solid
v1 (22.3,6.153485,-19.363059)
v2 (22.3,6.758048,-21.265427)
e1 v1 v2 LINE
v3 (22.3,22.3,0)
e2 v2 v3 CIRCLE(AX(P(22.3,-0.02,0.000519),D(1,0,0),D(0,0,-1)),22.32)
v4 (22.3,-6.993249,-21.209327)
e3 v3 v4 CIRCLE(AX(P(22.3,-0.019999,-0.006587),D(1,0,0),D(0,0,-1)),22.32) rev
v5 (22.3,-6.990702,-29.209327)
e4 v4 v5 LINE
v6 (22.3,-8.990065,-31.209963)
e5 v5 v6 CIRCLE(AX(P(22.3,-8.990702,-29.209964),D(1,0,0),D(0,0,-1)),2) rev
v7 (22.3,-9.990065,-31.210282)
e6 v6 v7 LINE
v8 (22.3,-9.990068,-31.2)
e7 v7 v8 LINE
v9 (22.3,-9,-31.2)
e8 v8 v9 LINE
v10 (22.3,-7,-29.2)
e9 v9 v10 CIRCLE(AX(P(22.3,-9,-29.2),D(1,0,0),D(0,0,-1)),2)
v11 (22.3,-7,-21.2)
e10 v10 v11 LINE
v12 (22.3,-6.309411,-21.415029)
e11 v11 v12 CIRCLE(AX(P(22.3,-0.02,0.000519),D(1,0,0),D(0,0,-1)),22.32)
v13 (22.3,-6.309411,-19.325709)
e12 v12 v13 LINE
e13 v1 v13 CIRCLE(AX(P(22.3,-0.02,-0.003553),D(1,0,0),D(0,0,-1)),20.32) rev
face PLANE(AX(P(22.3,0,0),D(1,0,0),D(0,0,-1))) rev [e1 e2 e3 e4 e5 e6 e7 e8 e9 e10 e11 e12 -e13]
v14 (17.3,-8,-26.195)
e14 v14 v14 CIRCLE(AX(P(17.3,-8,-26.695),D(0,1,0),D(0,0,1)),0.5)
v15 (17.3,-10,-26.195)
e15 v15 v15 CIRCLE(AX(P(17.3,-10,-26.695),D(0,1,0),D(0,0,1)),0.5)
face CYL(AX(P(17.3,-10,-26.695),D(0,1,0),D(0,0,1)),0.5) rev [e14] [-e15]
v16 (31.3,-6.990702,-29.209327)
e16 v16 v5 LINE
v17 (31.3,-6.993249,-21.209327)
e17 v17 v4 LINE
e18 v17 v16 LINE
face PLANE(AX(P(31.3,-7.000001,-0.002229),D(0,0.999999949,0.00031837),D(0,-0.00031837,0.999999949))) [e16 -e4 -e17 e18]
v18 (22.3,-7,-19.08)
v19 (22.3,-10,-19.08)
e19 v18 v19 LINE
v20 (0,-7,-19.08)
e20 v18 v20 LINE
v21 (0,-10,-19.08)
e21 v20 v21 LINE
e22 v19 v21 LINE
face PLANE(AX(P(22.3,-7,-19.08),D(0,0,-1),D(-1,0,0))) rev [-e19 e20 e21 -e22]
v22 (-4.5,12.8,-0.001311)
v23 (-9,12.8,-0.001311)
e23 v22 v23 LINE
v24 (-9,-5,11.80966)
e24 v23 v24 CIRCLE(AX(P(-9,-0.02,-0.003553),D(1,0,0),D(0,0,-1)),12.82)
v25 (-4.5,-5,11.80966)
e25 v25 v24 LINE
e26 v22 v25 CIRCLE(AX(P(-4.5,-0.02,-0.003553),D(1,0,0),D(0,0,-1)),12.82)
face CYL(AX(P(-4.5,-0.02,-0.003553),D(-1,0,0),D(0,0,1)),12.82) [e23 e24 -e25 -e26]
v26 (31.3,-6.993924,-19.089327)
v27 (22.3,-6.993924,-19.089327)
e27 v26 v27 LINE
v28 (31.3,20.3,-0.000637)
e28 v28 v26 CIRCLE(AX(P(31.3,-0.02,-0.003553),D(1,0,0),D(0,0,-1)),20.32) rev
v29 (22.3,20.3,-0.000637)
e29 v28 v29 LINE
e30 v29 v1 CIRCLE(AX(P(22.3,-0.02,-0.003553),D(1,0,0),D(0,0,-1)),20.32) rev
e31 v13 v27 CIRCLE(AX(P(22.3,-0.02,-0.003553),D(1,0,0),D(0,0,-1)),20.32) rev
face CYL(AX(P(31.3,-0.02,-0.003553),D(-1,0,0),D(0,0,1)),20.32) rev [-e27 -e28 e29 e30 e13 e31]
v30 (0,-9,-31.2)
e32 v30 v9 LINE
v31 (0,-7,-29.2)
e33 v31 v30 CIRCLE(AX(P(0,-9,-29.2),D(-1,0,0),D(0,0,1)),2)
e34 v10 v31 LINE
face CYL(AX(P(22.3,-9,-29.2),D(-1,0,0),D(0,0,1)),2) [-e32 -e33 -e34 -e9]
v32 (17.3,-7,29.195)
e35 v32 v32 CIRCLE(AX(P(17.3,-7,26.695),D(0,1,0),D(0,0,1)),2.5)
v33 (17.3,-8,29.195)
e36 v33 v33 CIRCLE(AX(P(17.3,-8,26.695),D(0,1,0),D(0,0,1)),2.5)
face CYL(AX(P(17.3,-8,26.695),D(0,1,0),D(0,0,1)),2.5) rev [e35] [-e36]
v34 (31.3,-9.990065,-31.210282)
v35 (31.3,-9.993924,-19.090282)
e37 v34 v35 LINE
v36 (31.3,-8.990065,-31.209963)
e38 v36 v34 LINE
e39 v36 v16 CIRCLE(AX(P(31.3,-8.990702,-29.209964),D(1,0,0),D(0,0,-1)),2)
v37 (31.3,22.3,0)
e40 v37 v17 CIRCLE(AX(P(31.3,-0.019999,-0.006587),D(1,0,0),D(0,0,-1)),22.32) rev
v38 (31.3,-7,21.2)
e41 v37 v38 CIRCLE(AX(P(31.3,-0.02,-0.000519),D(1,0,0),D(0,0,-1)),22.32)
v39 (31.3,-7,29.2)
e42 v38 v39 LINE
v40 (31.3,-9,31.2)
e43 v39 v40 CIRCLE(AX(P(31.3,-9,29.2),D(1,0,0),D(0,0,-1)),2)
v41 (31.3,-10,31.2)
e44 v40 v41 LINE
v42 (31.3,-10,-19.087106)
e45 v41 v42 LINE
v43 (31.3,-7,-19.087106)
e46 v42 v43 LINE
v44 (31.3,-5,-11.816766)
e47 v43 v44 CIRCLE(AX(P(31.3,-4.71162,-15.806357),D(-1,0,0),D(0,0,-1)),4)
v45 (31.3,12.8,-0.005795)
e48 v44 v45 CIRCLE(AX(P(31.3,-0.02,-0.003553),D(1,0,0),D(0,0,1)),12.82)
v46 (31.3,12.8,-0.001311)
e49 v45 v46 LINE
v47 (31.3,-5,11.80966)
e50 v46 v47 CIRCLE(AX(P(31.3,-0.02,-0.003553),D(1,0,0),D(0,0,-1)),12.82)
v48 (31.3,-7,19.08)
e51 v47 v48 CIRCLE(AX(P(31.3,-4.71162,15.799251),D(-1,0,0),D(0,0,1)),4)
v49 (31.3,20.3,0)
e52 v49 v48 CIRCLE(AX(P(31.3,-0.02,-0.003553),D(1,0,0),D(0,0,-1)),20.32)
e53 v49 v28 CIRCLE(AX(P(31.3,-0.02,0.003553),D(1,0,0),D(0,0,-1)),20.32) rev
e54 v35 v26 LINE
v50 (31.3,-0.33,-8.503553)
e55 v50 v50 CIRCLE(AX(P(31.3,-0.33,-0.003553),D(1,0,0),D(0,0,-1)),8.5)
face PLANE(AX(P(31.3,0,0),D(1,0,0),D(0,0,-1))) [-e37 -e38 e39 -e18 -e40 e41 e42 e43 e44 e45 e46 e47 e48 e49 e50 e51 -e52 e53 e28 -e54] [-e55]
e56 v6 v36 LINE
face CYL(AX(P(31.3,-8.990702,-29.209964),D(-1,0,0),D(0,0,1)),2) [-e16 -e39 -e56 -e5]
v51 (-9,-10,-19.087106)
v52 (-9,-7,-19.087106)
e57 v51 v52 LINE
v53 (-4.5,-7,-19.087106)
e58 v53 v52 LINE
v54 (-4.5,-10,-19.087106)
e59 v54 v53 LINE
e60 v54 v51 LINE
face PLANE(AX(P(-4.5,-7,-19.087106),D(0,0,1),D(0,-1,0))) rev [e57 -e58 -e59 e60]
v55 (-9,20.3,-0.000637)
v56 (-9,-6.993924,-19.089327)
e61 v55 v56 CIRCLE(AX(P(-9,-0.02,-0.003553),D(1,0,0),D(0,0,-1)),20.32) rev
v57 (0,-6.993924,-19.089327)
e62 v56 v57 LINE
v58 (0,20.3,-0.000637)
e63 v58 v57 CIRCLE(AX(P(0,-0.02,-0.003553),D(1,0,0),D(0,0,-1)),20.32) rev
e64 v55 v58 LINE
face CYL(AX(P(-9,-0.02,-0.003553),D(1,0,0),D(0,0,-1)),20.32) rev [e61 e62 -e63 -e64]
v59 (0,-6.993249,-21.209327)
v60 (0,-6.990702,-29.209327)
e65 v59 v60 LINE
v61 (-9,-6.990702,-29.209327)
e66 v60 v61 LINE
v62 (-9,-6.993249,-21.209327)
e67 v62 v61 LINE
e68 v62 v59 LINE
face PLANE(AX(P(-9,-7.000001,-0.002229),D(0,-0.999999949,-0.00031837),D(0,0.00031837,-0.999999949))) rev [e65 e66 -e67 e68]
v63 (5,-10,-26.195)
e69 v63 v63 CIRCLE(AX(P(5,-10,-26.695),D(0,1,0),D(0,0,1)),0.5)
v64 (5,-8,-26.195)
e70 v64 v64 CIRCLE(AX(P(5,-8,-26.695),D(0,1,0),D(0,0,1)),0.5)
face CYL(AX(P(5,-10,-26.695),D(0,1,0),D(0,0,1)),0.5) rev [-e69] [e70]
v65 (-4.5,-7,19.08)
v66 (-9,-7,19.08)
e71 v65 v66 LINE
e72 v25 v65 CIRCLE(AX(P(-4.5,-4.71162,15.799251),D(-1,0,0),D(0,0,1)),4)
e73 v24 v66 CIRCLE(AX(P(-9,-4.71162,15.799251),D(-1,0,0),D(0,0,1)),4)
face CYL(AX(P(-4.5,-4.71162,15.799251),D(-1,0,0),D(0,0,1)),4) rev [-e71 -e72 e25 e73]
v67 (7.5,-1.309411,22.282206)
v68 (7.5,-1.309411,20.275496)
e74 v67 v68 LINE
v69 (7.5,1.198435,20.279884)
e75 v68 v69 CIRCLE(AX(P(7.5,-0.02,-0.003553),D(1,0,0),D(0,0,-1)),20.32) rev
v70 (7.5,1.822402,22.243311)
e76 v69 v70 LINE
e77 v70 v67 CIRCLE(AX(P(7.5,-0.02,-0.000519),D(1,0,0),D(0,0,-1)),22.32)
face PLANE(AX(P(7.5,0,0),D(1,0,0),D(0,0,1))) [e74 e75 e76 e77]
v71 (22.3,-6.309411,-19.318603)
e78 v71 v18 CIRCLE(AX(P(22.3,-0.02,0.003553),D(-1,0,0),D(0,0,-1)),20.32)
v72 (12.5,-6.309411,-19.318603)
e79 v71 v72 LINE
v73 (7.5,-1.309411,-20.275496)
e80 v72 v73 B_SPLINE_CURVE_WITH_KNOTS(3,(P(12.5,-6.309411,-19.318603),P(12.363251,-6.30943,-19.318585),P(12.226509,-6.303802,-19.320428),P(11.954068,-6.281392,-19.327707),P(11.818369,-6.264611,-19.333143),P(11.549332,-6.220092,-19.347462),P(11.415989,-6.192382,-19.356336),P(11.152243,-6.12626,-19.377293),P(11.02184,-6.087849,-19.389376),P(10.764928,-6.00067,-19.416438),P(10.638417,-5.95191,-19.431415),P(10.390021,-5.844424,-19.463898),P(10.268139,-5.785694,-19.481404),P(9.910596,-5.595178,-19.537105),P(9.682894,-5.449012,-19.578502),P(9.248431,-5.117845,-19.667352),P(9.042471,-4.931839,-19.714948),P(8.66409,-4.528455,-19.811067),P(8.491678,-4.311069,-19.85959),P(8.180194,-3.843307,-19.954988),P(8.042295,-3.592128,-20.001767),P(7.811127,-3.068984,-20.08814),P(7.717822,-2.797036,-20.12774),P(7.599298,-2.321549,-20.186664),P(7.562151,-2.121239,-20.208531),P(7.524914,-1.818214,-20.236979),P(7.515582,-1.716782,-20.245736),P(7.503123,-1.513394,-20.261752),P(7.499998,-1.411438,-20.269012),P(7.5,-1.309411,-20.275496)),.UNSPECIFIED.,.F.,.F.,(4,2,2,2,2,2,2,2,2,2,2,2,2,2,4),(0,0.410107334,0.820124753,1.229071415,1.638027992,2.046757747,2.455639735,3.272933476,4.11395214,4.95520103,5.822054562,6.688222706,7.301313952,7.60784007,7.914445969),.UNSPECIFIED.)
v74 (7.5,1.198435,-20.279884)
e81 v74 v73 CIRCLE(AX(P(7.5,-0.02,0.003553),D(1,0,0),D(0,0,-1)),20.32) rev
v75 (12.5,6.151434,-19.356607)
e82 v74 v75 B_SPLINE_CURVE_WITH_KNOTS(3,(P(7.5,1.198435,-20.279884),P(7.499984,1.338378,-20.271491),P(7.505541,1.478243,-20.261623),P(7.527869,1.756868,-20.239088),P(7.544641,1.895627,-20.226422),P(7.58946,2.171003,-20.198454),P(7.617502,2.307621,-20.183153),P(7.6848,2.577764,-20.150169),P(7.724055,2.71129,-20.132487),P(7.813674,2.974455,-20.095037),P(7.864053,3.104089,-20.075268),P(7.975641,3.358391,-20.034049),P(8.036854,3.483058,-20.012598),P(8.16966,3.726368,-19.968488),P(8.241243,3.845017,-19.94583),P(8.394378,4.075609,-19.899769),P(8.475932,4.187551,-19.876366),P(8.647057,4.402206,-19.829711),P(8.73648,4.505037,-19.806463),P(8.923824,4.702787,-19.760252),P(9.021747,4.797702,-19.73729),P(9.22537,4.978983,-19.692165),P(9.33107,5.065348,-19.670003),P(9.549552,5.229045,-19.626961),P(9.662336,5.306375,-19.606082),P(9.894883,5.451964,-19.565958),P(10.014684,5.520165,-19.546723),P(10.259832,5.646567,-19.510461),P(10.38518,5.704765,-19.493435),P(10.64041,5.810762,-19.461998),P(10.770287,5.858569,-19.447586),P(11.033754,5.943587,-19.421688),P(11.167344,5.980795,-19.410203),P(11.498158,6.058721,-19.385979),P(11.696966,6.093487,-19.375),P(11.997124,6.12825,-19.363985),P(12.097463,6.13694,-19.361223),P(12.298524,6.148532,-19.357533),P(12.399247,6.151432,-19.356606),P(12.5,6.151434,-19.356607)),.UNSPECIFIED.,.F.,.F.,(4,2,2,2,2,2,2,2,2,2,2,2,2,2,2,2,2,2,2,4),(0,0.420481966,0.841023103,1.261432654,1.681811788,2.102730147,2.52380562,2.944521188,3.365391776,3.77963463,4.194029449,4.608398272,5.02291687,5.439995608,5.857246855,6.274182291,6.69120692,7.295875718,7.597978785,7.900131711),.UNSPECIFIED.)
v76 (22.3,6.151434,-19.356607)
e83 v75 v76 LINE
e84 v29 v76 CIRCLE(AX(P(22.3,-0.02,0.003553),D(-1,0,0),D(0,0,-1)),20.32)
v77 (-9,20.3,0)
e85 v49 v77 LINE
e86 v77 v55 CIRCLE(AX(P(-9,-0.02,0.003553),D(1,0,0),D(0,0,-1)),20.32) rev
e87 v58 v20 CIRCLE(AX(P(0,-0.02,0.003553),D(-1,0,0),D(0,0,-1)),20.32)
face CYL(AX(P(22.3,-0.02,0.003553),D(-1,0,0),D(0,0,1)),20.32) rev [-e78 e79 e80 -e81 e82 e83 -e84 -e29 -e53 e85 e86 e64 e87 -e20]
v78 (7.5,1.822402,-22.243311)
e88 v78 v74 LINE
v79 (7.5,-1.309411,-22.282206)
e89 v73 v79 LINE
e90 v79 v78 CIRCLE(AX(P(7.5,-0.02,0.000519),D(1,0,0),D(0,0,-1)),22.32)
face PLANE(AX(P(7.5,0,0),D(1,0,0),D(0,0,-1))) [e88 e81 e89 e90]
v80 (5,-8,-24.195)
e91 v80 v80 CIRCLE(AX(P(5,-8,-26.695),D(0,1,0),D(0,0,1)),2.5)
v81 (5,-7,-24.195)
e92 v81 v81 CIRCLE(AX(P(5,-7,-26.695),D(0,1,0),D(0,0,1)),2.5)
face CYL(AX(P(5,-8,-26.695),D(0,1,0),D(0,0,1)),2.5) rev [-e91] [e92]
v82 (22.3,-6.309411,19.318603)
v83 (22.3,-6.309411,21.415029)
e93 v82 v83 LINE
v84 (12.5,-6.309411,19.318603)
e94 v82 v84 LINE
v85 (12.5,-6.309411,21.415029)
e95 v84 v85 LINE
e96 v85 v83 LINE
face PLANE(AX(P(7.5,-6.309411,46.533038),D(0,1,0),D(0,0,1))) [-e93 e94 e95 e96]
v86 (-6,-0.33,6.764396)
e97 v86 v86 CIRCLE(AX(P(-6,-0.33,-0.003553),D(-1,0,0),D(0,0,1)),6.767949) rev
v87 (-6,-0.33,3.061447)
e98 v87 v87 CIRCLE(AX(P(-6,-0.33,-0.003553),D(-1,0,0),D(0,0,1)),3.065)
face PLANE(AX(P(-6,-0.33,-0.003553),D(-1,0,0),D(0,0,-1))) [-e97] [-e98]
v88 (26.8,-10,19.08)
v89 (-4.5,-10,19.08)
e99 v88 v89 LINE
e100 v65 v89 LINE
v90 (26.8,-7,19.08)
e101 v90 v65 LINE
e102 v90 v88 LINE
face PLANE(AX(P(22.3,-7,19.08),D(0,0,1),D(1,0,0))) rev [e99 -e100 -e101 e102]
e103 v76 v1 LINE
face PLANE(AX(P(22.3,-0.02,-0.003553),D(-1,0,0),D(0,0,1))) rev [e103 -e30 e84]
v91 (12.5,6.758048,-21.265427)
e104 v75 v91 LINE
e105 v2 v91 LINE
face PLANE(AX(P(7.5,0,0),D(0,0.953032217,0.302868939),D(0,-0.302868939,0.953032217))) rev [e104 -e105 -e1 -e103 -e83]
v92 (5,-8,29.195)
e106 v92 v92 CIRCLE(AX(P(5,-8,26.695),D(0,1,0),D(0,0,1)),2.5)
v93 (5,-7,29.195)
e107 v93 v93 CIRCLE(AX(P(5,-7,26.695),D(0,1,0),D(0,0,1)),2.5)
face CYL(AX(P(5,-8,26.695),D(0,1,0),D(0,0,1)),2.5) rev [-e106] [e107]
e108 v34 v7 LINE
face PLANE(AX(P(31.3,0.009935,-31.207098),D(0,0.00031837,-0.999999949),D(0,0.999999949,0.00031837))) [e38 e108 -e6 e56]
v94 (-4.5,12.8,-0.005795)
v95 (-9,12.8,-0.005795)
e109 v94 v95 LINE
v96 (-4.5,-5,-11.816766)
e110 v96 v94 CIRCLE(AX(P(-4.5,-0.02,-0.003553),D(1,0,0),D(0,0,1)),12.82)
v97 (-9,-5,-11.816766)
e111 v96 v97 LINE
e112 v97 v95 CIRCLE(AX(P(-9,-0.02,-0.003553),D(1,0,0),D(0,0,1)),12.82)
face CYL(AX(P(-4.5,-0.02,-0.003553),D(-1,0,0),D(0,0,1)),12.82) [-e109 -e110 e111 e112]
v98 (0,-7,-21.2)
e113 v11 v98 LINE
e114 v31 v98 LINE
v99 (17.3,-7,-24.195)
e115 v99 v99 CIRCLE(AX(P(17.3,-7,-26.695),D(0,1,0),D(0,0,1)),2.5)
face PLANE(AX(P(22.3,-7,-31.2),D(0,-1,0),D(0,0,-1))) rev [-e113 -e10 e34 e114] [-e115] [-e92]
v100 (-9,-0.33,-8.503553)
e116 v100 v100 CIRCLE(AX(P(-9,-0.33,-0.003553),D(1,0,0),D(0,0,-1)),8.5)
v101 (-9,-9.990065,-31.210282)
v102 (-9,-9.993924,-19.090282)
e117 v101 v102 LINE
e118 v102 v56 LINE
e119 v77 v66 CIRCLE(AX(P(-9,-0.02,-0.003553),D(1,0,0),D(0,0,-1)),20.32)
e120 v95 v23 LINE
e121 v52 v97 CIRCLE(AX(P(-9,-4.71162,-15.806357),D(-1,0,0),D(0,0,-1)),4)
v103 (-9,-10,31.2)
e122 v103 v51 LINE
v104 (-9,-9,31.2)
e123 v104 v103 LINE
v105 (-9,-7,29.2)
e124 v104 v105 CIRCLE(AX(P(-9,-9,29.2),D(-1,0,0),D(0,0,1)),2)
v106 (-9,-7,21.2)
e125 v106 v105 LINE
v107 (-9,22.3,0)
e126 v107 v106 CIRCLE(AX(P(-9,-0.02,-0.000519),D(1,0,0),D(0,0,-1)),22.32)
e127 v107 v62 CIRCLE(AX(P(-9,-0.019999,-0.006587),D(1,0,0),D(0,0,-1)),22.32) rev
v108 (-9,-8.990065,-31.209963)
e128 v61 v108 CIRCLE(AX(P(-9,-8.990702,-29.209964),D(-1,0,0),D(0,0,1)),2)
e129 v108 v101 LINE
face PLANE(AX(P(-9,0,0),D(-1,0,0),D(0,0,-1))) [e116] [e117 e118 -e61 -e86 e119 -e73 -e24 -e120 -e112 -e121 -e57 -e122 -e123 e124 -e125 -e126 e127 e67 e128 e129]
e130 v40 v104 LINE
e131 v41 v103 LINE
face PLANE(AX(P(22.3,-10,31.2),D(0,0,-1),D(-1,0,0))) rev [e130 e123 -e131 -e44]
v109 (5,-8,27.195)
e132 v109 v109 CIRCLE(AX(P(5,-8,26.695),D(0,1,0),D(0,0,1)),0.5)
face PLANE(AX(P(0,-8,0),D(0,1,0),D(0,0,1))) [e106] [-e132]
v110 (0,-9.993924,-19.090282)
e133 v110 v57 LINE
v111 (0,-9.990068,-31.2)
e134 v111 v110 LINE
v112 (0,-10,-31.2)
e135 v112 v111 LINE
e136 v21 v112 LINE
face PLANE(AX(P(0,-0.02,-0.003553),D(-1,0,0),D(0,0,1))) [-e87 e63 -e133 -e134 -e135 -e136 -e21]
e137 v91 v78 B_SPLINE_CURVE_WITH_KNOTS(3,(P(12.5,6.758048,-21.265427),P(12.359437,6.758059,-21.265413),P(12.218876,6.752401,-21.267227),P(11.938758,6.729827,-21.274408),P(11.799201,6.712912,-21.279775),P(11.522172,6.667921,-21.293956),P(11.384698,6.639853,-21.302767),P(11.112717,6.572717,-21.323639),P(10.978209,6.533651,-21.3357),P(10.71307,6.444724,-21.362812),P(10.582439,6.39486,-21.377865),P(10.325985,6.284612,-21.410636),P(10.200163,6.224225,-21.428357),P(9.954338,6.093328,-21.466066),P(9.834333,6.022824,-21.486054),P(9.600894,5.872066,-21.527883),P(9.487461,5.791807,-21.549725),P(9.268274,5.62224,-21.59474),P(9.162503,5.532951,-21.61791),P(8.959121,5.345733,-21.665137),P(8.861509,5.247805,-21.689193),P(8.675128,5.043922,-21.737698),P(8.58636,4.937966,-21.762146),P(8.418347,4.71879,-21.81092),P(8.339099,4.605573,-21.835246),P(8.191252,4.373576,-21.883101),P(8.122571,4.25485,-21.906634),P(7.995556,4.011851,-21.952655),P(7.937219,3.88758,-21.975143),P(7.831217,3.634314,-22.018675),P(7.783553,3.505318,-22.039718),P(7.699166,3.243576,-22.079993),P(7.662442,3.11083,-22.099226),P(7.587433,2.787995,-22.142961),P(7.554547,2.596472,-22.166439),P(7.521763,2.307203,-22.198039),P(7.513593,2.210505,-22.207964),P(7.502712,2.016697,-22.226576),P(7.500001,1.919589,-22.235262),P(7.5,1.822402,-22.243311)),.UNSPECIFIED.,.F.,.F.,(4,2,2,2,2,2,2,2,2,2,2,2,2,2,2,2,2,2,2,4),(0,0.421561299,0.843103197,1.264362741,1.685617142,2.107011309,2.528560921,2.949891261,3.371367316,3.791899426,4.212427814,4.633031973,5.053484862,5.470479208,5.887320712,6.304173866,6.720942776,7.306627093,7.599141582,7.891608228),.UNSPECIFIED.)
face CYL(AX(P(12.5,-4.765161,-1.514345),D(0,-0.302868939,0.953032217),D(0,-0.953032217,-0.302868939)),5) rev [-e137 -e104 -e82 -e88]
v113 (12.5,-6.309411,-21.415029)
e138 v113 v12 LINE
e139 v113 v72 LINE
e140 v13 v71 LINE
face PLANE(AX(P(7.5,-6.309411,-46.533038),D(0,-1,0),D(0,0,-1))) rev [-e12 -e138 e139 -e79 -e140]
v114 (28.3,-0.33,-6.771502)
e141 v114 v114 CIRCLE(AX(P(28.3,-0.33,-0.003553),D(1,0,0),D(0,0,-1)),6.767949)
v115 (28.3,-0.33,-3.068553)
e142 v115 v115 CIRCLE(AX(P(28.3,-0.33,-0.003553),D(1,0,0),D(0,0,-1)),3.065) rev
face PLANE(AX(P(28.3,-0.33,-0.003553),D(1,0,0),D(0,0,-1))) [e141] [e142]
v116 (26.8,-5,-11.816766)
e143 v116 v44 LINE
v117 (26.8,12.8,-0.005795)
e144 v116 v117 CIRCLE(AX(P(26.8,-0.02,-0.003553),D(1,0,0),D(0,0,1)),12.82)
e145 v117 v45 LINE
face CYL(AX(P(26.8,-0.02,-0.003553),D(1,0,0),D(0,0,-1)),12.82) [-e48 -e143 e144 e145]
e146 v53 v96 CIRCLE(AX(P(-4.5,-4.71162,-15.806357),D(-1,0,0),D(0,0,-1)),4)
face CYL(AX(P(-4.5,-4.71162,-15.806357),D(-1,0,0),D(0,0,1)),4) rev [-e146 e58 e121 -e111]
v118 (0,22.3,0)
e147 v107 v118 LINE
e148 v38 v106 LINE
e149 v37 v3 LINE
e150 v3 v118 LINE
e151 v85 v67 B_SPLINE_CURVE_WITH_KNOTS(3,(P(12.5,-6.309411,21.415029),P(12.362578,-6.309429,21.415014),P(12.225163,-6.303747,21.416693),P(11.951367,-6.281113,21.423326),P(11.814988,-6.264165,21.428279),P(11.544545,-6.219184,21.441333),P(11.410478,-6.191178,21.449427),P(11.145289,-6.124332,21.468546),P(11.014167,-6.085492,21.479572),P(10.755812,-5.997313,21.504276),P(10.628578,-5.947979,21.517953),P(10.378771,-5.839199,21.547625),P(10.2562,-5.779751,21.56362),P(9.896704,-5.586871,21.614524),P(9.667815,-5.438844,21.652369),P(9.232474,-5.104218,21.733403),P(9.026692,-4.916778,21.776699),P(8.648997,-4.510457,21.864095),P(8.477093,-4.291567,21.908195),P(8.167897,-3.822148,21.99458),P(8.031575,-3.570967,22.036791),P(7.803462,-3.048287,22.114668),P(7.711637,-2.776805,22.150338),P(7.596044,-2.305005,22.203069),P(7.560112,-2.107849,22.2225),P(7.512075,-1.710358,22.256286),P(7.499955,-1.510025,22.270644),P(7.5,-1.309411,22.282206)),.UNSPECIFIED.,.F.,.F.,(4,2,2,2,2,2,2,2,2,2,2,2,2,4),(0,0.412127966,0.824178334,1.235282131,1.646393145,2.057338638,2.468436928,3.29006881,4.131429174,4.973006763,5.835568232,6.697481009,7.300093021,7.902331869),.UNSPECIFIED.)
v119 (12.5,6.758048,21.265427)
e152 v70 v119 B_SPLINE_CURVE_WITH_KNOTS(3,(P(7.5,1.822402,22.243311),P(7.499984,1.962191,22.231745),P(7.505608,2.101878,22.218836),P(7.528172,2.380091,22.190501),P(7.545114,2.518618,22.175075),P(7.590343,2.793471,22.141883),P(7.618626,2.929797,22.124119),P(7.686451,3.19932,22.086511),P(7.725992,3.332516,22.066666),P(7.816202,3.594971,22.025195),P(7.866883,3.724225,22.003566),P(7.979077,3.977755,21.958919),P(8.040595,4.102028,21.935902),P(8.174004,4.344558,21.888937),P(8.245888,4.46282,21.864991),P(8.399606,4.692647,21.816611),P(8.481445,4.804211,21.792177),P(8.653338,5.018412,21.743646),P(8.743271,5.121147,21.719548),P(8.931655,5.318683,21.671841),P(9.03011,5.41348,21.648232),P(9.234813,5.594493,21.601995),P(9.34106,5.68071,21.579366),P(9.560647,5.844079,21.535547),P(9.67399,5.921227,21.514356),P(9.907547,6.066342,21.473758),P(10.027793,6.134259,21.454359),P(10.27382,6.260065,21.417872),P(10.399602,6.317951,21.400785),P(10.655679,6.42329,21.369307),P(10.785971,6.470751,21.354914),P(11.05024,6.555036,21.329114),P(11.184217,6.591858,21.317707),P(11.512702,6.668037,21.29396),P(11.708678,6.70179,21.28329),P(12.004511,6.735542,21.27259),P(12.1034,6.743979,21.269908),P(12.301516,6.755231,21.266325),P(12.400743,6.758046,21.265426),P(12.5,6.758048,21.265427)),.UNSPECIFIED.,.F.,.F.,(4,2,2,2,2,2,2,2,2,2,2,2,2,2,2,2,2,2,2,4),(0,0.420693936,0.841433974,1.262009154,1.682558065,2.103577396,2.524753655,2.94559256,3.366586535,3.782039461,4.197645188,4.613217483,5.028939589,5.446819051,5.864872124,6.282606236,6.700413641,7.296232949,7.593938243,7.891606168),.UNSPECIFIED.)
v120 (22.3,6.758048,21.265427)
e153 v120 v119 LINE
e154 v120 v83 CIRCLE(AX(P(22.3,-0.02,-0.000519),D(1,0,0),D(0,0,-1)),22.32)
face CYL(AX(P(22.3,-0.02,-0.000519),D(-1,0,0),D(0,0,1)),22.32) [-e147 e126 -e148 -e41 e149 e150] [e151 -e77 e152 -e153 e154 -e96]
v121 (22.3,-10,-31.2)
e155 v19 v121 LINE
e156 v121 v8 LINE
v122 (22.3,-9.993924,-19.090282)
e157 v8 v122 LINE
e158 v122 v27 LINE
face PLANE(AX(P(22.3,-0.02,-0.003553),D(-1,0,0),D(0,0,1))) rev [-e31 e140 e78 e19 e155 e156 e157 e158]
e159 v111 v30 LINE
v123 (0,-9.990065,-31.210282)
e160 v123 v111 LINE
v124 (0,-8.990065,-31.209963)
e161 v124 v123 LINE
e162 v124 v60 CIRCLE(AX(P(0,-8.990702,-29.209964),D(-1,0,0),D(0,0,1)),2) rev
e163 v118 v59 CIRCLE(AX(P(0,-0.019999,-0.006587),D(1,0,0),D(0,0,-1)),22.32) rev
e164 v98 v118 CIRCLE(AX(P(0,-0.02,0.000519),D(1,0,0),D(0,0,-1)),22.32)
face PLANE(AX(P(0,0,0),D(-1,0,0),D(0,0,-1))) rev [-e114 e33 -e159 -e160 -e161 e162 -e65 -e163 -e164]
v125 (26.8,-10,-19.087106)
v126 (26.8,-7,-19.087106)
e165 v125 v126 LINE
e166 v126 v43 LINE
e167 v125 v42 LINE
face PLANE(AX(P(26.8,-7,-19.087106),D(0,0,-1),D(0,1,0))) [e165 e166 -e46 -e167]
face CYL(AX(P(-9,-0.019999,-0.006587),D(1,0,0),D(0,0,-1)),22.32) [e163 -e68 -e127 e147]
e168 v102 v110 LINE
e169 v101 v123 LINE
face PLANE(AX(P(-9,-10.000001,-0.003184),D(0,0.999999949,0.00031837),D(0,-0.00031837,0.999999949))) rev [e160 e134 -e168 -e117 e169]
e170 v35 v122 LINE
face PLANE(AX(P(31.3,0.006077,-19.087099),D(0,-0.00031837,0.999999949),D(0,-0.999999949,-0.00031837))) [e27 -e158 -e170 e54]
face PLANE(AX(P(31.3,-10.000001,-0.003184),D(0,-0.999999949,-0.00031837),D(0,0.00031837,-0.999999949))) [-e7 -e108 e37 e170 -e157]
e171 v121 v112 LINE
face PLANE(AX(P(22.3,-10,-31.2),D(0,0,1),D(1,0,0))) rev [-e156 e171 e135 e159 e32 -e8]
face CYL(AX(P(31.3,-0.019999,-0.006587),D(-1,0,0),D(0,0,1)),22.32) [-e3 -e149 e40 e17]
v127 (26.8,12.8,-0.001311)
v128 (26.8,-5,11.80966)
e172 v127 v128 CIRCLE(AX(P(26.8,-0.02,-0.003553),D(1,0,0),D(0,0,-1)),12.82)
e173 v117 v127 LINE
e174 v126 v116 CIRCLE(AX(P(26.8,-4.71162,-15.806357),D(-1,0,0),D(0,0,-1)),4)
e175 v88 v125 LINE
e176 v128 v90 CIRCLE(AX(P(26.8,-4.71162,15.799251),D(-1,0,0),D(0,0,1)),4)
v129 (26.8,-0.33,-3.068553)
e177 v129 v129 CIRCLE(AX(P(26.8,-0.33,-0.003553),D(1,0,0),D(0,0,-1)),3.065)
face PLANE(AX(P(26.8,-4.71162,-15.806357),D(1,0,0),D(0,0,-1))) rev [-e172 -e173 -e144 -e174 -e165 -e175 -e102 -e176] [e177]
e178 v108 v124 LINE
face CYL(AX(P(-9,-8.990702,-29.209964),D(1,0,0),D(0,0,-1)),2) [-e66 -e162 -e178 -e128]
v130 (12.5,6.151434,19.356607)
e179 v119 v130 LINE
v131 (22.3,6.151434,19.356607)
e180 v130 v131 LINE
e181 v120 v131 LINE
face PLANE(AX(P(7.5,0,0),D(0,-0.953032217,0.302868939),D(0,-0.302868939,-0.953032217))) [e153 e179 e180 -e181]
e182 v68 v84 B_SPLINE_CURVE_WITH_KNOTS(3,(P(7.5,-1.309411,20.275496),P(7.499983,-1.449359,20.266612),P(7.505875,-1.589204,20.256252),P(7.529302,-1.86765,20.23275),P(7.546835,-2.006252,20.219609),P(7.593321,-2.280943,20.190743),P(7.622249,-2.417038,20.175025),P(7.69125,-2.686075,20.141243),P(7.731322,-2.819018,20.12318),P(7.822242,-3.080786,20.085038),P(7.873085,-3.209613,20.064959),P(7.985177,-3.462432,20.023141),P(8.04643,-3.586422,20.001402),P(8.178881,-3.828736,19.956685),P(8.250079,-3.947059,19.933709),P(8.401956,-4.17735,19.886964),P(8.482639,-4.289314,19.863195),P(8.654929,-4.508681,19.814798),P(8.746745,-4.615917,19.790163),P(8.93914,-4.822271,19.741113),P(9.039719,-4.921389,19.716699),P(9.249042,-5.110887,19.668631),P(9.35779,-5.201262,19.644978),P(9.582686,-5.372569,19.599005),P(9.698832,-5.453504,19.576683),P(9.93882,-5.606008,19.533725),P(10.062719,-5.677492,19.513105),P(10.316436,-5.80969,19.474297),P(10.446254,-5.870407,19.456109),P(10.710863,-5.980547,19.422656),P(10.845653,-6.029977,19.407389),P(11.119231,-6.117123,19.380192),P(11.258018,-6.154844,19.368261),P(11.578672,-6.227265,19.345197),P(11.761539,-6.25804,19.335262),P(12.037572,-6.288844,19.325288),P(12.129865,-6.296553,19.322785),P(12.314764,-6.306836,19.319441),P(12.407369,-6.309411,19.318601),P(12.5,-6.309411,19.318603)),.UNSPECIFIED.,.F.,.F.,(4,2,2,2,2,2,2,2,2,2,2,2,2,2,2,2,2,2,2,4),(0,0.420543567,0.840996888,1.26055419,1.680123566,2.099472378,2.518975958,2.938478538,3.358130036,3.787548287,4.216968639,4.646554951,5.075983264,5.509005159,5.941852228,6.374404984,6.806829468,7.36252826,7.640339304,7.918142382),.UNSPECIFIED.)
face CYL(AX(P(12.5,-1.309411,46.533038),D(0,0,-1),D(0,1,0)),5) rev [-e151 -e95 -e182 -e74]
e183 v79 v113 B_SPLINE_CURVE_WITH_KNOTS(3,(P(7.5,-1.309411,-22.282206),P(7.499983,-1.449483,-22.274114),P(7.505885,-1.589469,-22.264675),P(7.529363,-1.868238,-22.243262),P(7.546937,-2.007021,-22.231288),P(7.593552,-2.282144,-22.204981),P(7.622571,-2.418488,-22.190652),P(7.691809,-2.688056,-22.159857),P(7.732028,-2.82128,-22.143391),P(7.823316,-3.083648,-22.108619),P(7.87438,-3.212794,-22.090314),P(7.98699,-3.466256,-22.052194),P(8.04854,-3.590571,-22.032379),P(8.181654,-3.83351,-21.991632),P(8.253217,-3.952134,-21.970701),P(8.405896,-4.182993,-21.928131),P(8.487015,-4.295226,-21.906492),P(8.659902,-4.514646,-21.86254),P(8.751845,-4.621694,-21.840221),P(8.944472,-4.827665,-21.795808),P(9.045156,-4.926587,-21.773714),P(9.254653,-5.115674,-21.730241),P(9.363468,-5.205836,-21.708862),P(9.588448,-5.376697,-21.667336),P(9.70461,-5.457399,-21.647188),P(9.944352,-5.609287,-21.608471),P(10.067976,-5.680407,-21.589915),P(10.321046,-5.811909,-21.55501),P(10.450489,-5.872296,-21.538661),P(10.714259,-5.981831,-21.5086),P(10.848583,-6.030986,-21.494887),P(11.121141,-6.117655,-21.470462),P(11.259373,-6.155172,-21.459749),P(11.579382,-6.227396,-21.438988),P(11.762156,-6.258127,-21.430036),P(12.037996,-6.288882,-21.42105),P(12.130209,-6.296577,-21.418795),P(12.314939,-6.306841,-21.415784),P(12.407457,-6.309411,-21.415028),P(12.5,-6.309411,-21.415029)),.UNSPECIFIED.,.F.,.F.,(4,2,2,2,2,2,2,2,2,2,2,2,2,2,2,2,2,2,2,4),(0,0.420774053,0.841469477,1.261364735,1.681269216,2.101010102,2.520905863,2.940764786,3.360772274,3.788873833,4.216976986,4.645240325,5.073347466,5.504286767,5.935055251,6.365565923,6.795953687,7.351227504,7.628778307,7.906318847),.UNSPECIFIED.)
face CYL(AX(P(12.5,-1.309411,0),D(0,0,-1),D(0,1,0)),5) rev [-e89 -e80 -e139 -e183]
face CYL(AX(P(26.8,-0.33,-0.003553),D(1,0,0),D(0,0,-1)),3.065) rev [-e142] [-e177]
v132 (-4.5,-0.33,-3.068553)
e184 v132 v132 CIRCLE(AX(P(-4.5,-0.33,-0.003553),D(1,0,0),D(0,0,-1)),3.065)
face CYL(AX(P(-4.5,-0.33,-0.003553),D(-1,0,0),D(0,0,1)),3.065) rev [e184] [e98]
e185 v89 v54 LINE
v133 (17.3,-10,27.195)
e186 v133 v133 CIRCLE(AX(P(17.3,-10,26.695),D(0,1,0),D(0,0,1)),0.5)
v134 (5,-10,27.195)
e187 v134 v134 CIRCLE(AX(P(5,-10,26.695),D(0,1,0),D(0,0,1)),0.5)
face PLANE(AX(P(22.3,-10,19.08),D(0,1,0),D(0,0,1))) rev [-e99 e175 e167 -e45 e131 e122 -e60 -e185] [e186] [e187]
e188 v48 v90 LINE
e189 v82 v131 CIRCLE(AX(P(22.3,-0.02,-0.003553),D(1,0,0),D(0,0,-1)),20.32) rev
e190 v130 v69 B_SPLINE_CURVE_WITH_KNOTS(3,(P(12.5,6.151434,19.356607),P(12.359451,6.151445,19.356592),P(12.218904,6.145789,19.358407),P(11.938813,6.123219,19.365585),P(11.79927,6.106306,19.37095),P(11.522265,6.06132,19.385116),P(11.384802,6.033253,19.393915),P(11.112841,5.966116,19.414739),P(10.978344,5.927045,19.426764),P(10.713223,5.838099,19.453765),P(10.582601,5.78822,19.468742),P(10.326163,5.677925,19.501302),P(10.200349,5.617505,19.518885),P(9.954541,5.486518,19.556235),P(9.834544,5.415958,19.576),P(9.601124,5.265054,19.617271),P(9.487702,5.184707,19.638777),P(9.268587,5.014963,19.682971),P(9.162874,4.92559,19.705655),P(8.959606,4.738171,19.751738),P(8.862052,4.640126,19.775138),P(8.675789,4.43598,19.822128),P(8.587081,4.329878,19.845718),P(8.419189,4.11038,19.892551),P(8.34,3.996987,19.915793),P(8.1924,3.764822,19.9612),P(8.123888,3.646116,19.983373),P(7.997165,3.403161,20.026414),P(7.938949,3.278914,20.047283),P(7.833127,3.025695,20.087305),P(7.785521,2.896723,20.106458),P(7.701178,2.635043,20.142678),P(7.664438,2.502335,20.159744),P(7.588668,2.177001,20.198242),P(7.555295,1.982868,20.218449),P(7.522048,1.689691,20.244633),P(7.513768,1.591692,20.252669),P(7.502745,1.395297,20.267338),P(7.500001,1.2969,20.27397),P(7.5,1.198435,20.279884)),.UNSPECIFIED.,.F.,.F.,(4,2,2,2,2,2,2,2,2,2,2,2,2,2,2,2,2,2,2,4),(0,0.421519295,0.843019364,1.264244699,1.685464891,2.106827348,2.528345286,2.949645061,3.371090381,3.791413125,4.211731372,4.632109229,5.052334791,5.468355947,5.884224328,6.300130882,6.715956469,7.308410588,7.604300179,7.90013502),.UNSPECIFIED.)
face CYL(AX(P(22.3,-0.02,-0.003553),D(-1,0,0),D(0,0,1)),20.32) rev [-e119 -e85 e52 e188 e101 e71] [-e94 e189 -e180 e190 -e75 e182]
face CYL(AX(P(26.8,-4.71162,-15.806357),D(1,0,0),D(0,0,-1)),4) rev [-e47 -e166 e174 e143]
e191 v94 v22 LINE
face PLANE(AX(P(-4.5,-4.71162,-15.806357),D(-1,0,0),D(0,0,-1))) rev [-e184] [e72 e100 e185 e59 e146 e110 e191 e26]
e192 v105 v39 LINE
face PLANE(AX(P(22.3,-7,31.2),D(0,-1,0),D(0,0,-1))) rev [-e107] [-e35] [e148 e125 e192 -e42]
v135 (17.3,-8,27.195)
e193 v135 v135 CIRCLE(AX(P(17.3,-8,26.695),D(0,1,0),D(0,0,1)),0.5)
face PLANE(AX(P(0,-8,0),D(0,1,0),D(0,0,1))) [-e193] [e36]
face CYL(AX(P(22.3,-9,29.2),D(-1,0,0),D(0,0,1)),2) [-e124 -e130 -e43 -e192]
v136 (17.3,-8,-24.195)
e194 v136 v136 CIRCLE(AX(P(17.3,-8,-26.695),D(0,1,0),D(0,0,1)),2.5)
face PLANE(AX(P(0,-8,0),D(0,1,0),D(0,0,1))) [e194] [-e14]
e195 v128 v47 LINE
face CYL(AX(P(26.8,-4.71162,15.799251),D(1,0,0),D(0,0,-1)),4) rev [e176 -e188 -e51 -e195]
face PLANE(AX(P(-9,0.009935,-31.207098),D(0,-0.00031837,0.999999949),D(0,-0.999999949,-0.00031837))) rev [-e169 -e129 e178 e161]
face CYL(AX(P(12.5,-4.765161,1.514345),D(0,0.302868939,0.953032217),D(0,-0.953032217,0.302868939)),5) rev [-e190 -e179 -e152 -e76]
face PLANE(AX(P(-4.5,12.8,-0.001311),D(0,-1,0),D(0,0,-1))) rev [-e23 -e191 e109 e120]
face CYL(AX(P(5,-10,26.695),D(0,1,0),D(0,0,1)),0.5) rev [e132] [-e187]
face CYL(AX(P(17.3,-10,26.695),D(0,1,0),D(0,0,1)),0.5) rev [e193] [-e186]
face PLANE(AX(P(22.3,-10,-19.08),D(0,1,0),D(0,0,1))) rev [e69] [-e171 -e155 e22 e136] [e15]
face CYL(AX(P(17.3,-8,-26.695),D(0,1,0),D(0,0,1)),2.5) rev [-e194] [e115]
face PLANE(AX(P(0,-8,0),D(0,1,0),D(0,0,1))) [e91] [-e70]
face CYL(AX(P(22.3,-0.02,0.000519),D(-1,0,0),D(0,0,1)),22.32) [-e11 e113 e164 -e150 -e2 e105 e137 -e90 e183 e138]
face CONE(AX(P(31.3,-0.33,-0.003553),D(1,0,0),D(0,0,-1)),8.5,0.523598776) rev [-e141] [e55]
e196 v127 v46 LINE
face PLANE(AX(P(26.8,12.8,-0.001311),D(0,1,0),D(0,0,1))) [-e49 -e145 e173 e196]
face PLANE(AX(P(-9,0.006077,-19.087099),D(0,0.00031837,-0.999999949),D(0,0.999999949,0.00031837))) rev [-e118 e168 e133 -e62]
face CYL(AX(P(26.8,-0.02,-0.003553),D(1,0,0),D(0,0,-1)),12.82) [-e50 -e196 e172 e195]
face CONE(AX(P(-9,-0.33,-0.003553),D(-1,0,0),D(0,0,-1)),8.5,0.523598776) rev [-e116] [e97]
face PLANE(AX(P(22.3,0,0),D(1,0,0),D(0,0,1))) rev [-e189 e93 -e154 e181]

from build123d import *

# Parameters (mm, degrees)
BOSS_EXTRUDE1_DEPTH     = 22.3
SKETCH4_R               = 2.5
CUT_EXTRUDE1_DEPTH      = 1
SKETCH5_R               = 0.5
CUT_EXTRUDE2_DEPTH      = 49.261993328
CUT_EXTRUDE3_DEPTH      = 14.8
FILLET1_R               = 5
BOSS_EXTRUDE2_DEPTH     = 9
FILLET2_R               = 2
FILLET3_R               = 5
SKETCH11_R              = 3.065
BOSS_EXTRUDE3_DEPTH     = 4.5
SKETCH12_R              = 8.5
CUT_EXTRUDE4_DEPTH      = 3
CUT_EXTRUDE4_DRAFT      = -30
MIRROR5_COPY_1_SKETCH_R = 8.5
MIRROR5_COPY_1_DEPTH    = 3
MIRROR5_COPY_1_DRAFT    = -30


# Read off the part's stored shape, not the designer's step: Boss-Extrude2
with BuildPart() as part:
    # Sketch2 → Boss-Extrude1 (new body)
    with BuildSketch(Plane(origin=(0, 0, 0), x_dir=(0, 0, -1), z_dir=(1, 0, 0))):
        with BuildLine():
            Line((-19.08, -7), (-19.08, -10))
            Line((-19.08, -10), (-31.2, -10))
            Line((-31.2, -10), (-31.2, -7))
            Line((-31.2, -7), (-21.2, -7))
            ThreePointArc((-21.2, -7), (-18.082442737, 13.063917612), (0, 22.3))
            ThreePointArc((0, 22.3), (18.082442737, 13.063917612), (21.2, -7))
            Line((21.2, -7), (31.2, -7))
            Line((31.2, -7), (31.2, -10))
            Line((31.2, -10), (19.08, -10))
            Line((19.08, -10), (19.08, -7))
            ThreePointArc((19.08, -7), (16.651833626, 11.620468336), (0, 20.3))
            ThreePointArc((0, 20.3), (-16.651833626, 11.620468336), (-19.08, -7))
        make_face()
    extrude(amount=BOSS_EXTRUDE1_DEPTH)

    # Sketch4 → Cut-Extrude1 (cut)
    with BuildSketch(Plane(origin=(0, -7, 0), x_dir=(1, 0, 0), z_dir=(0, 1, 0))):
        with Locations(Location((5, 26.695, 0), (0, 0, 270))):
            Circle(SKETCH4_R)
        with Locations(Location((17.3, 26.695, 0), (0, 0, 270))):
            Circle(SKETCH4_R)
        with Locations(Location((5, -26.695, 0), (0, 0, 270))):
            Circle(SKETCH4_R)
        with Locations(Location((17.3, -26.695, 0), (0, 0, 270))):
            Circle(SKETCH4_R)
    extrude(amount=-CUT_EXTRUDE1_DEPTH, mode=Mode.SUBTRACT)

    # Sketch5 → Cut-Extrude2 (cut, through all)
    with BuildSketch(Plane(origin=(0, -7, 0), x_dir=(1, 0, 0), z_dir=(0, 1, 0))):
        with Locations(Location((17.3, 26.695, 0), (0, 0, 270))):
            Circle(SKETCH5_R)
        with Locations(Location((5, 26.695, 0), (0, 0, 270))):
            Circle(SKETCH5_R)
        with Locations(Location((5, -26.695, 0), (0, 0, 270))):
            Circle(SKETCH5_R)
        with Locations(Location((17.3, -26.695, 0), (0, 0, 270))):
            Circle(SKETCH5_R)
    extrude(amount=-CUT_EXTRUDE2_DEPTH, mode=Mode.SUBTRACT)

    # Sketch6 → Cut-Extrude3 (cut)
    with BuildSketch(Plane(origin=(22.3, 0, 0), x_dir=(0, 0, -1), z_dir=(1, 0, 0))):
        Polygon((0, 0), (46.533038178, 14.787970064), (46.533038178, -6.309411423), (19, -6.309411423), align=None)
    cut_extrude3 = extrude(amount=-CUT_EXTRUDE3_DEPTH, mode=Mode.SUBTRACT)

    # Fillet1
    fillet1_edges = [part.edges().sort_by_distance(p)[0] for p in [
        (7.5, 6.454741119, -20.311017239),
        (7.5, -6.309411423, -20.366815992),
    ]]
    fillet(fillet1_edges, radius=FILLET1_R)

    # Boss-Extrude2 outline → Boss-Extrude2 (add)
    with BuildSketch(Plane(origin=(22.3, 0, 0), x_dir=(0, 0, -1), z_dir=(1, 0, 0))):
        with BuildLine():
            Line((-19.08, -10), (-19.08, -7))
            ThreePointArc((-19.08, -7), (-16.651833626, 11.620468336), (0, 20.3))
            ThreePointArc((0, 20.3), (0.00031837, 20.299999942), (0.000636741, 20.299999879))
            ThreePointArc((0.000636741, 20.299999879), (16.65523283, 11.62577033), (19.089327288, -6.993924006))
            Line((19.089327288, -6.993924006), (19.0902824, -9.993923854))
            Line((19.0902824, -9.993923854), (31.210281785, -9.990065204))
            Line((31.210281785, -9.990065204), (31.209326674, -6.990065356))
            Line((31.209326674, -6.990065356), (21.209327181, -6.993249061))
            ThreePointArc((21.209327181, -6.993249061), (18.085382316, 13.069674996), (0, 22.3))
            ThreePointArc((0, 22.3), (-18.082442737, 13.063917612), (-21.2, -7))
            Line((-21.2, -7), (-31.2, -7))
            Line((-31.2, -7), (-31.2, -10))
            Line((-31.2, -10), (-19.08, -10))
        make_face()
    boss_extrude2 = extrude(amount=BOSS_EXTRUDE2_DEPTH)

    # Mirror1: Boss-Extrude2 across plane
    add(boss_extrude2.mirror(Plane(origin=(11.15, 0, 0), x_dir=(0, 0, 1), z_dir=(1, 0, 0))))

    # Fillet2
    fillet2_edges = [part.edges().sort_by_distance(p)[0] for p in [
        (26.8, -6.990065356, -31.209326674),
        (-4.5, -6.990065356, -31.209326674),
        (11.15, -7, 31.2),
        (11.15, -7, -31.2),
    ]]
    fillet(fillet2_edges, radius=FILLET2_R)

    # Mirror2: Cut-Extrude3 across plane
    add(cut_extrude3.mirror(Plane.XY), mode=Mode.SUBTRACT)

    # Fillet3
    fillet3_edges = [part.edges().sort_by_distance(p)[0] for p in [
        (7.5, -6.309411423, 20.366815992),
        (7.5, 6.454741119, 20.311017239),
    ]]
    fillet(fillet3_edges, radius=FILLET3_R)

    # Sketch11 → Boss-Extrude3 (add)
    with BuildSketch(Plane(origin=(31.3, 0, 0), x_dir=(0, 0, -1), z_dir=(1, 0, 0))):
        with BuildLine():
            Line((-19.08, -10), (19.087106029, -10))
            Line((19.087106029, -10), (19.087106029, -7))
            ThreePointArc((19.087106029, -7), (14.745407201, -8.568352102), (11.816765825, -5))
            ThreePointArc((11.816765825, -5), (10.685839373, 7.068100067), (0.005794631, 12.800000115))
            Line((0.005794631, 12.800000115), (0.001311398, 12.800000115))
            ThreePointArc((0.001311398, 12.800000115), (-10.678733344, 7.068100067), (-11.809659796, -5))
            ThreePointArc((-11.809659796, -5), (-14.738301172, -8.568352102), (-19.08, -7))
            Line((-19.08, -7), (-19.08, -10))
        make_face()
        with Locations((0.003553015, -0.329999689)):
            Circle(SKETCH11_R, mode=Mode.SUBTRACT)
    boss_extrude3 = extrude(amount=-BOSS_EXTRUDE3_DEPTH)


with BuildPart() as cut_extrude4_tool:
    # Sketch12 → Cut-Extrude4 (with draft: the straight prism first)
    with BuildSketch(Plane(origin=(31.3, 0, 0), x_dir=(0, 0, -1), z_dir=(1, 0, 0))):
        with Locations((0.003553015, -0.329999689)):
            Circle(SKETCH12_R)
    extrude(amount=-CUT_EXTRUDE4_DEPTH)
    # Cut-Extrude4: the draft: its side faces are tilted about the plane it starts from
    cut_extrude4_sides = [cut_extrude4_tool.faces().sort_by_distance(p)[0] for p in [
        (29.8, -0.329999689, 8.496446985),
    ]]
    draft(cut_extrude4_sides, Plane(origin=(31.3, 0, 0), x_dir=(0, 0, -1), z_dir=(1, 0, 0)), CUT_EXTRUDE4_DRAFT)


with BuildPart() as part_1:
    add(part.part)

    # Cut-Extrude4: cut by cut_extrude4_tool
    add(cut_extrude4_tool.part, mode=Mode.SUBTRACT)

    # Mirror4: Boss-Extrude3 across plane
    add(boss_extrude3.mirror(Plane(origin=(11.15, 0, 0), x_dir=(0, 0, 1), z_dir=(1, 0, 0))))


with BuildPart() as mirror5_copy_1_tool:
    # Mirror5 copy 1 sketch → Mirror5 copy 1 (with draft: the straight prism first)
    with BuildSketch(Plane(origin=(-9, 0, 0), x_dir=(0, 0, -1), z_dir=(-1, 0, 0))):
        with Locations((0.003553015, 0.329999689)):
            Circle(MIRROR5_COPY_1_SKETCH_R)
    extrude(amount=-MIRROR5_COPY_1_DEPTH)
    # Mirror5 copy 1: the draft: its side faces are tilted about the plane it starts from
    mirror5_copy_1_sides = [mirror5_copy_1_tool.faces().sort_by_distance(p)[0] for p in [
        (-7.5, -0.329999689, 8.496446985),
    ]]
    draft(mirror5_copy_1_sides, Plane(origin=(-9, 0, 0), x_dir=(0, 0, -1), z_dir=(-1, 0, 0)), MIRROR5_COPY_1_DRAFT)


with BuildPart() as part_2:
    add(part_1.part)

    # Mirror5 copy 1: cut by mirror5_copy_1_tool
    add(mirror5_copy_1_tool.part, mode=Mode.SUBTRACT)


solid = part_2.part
